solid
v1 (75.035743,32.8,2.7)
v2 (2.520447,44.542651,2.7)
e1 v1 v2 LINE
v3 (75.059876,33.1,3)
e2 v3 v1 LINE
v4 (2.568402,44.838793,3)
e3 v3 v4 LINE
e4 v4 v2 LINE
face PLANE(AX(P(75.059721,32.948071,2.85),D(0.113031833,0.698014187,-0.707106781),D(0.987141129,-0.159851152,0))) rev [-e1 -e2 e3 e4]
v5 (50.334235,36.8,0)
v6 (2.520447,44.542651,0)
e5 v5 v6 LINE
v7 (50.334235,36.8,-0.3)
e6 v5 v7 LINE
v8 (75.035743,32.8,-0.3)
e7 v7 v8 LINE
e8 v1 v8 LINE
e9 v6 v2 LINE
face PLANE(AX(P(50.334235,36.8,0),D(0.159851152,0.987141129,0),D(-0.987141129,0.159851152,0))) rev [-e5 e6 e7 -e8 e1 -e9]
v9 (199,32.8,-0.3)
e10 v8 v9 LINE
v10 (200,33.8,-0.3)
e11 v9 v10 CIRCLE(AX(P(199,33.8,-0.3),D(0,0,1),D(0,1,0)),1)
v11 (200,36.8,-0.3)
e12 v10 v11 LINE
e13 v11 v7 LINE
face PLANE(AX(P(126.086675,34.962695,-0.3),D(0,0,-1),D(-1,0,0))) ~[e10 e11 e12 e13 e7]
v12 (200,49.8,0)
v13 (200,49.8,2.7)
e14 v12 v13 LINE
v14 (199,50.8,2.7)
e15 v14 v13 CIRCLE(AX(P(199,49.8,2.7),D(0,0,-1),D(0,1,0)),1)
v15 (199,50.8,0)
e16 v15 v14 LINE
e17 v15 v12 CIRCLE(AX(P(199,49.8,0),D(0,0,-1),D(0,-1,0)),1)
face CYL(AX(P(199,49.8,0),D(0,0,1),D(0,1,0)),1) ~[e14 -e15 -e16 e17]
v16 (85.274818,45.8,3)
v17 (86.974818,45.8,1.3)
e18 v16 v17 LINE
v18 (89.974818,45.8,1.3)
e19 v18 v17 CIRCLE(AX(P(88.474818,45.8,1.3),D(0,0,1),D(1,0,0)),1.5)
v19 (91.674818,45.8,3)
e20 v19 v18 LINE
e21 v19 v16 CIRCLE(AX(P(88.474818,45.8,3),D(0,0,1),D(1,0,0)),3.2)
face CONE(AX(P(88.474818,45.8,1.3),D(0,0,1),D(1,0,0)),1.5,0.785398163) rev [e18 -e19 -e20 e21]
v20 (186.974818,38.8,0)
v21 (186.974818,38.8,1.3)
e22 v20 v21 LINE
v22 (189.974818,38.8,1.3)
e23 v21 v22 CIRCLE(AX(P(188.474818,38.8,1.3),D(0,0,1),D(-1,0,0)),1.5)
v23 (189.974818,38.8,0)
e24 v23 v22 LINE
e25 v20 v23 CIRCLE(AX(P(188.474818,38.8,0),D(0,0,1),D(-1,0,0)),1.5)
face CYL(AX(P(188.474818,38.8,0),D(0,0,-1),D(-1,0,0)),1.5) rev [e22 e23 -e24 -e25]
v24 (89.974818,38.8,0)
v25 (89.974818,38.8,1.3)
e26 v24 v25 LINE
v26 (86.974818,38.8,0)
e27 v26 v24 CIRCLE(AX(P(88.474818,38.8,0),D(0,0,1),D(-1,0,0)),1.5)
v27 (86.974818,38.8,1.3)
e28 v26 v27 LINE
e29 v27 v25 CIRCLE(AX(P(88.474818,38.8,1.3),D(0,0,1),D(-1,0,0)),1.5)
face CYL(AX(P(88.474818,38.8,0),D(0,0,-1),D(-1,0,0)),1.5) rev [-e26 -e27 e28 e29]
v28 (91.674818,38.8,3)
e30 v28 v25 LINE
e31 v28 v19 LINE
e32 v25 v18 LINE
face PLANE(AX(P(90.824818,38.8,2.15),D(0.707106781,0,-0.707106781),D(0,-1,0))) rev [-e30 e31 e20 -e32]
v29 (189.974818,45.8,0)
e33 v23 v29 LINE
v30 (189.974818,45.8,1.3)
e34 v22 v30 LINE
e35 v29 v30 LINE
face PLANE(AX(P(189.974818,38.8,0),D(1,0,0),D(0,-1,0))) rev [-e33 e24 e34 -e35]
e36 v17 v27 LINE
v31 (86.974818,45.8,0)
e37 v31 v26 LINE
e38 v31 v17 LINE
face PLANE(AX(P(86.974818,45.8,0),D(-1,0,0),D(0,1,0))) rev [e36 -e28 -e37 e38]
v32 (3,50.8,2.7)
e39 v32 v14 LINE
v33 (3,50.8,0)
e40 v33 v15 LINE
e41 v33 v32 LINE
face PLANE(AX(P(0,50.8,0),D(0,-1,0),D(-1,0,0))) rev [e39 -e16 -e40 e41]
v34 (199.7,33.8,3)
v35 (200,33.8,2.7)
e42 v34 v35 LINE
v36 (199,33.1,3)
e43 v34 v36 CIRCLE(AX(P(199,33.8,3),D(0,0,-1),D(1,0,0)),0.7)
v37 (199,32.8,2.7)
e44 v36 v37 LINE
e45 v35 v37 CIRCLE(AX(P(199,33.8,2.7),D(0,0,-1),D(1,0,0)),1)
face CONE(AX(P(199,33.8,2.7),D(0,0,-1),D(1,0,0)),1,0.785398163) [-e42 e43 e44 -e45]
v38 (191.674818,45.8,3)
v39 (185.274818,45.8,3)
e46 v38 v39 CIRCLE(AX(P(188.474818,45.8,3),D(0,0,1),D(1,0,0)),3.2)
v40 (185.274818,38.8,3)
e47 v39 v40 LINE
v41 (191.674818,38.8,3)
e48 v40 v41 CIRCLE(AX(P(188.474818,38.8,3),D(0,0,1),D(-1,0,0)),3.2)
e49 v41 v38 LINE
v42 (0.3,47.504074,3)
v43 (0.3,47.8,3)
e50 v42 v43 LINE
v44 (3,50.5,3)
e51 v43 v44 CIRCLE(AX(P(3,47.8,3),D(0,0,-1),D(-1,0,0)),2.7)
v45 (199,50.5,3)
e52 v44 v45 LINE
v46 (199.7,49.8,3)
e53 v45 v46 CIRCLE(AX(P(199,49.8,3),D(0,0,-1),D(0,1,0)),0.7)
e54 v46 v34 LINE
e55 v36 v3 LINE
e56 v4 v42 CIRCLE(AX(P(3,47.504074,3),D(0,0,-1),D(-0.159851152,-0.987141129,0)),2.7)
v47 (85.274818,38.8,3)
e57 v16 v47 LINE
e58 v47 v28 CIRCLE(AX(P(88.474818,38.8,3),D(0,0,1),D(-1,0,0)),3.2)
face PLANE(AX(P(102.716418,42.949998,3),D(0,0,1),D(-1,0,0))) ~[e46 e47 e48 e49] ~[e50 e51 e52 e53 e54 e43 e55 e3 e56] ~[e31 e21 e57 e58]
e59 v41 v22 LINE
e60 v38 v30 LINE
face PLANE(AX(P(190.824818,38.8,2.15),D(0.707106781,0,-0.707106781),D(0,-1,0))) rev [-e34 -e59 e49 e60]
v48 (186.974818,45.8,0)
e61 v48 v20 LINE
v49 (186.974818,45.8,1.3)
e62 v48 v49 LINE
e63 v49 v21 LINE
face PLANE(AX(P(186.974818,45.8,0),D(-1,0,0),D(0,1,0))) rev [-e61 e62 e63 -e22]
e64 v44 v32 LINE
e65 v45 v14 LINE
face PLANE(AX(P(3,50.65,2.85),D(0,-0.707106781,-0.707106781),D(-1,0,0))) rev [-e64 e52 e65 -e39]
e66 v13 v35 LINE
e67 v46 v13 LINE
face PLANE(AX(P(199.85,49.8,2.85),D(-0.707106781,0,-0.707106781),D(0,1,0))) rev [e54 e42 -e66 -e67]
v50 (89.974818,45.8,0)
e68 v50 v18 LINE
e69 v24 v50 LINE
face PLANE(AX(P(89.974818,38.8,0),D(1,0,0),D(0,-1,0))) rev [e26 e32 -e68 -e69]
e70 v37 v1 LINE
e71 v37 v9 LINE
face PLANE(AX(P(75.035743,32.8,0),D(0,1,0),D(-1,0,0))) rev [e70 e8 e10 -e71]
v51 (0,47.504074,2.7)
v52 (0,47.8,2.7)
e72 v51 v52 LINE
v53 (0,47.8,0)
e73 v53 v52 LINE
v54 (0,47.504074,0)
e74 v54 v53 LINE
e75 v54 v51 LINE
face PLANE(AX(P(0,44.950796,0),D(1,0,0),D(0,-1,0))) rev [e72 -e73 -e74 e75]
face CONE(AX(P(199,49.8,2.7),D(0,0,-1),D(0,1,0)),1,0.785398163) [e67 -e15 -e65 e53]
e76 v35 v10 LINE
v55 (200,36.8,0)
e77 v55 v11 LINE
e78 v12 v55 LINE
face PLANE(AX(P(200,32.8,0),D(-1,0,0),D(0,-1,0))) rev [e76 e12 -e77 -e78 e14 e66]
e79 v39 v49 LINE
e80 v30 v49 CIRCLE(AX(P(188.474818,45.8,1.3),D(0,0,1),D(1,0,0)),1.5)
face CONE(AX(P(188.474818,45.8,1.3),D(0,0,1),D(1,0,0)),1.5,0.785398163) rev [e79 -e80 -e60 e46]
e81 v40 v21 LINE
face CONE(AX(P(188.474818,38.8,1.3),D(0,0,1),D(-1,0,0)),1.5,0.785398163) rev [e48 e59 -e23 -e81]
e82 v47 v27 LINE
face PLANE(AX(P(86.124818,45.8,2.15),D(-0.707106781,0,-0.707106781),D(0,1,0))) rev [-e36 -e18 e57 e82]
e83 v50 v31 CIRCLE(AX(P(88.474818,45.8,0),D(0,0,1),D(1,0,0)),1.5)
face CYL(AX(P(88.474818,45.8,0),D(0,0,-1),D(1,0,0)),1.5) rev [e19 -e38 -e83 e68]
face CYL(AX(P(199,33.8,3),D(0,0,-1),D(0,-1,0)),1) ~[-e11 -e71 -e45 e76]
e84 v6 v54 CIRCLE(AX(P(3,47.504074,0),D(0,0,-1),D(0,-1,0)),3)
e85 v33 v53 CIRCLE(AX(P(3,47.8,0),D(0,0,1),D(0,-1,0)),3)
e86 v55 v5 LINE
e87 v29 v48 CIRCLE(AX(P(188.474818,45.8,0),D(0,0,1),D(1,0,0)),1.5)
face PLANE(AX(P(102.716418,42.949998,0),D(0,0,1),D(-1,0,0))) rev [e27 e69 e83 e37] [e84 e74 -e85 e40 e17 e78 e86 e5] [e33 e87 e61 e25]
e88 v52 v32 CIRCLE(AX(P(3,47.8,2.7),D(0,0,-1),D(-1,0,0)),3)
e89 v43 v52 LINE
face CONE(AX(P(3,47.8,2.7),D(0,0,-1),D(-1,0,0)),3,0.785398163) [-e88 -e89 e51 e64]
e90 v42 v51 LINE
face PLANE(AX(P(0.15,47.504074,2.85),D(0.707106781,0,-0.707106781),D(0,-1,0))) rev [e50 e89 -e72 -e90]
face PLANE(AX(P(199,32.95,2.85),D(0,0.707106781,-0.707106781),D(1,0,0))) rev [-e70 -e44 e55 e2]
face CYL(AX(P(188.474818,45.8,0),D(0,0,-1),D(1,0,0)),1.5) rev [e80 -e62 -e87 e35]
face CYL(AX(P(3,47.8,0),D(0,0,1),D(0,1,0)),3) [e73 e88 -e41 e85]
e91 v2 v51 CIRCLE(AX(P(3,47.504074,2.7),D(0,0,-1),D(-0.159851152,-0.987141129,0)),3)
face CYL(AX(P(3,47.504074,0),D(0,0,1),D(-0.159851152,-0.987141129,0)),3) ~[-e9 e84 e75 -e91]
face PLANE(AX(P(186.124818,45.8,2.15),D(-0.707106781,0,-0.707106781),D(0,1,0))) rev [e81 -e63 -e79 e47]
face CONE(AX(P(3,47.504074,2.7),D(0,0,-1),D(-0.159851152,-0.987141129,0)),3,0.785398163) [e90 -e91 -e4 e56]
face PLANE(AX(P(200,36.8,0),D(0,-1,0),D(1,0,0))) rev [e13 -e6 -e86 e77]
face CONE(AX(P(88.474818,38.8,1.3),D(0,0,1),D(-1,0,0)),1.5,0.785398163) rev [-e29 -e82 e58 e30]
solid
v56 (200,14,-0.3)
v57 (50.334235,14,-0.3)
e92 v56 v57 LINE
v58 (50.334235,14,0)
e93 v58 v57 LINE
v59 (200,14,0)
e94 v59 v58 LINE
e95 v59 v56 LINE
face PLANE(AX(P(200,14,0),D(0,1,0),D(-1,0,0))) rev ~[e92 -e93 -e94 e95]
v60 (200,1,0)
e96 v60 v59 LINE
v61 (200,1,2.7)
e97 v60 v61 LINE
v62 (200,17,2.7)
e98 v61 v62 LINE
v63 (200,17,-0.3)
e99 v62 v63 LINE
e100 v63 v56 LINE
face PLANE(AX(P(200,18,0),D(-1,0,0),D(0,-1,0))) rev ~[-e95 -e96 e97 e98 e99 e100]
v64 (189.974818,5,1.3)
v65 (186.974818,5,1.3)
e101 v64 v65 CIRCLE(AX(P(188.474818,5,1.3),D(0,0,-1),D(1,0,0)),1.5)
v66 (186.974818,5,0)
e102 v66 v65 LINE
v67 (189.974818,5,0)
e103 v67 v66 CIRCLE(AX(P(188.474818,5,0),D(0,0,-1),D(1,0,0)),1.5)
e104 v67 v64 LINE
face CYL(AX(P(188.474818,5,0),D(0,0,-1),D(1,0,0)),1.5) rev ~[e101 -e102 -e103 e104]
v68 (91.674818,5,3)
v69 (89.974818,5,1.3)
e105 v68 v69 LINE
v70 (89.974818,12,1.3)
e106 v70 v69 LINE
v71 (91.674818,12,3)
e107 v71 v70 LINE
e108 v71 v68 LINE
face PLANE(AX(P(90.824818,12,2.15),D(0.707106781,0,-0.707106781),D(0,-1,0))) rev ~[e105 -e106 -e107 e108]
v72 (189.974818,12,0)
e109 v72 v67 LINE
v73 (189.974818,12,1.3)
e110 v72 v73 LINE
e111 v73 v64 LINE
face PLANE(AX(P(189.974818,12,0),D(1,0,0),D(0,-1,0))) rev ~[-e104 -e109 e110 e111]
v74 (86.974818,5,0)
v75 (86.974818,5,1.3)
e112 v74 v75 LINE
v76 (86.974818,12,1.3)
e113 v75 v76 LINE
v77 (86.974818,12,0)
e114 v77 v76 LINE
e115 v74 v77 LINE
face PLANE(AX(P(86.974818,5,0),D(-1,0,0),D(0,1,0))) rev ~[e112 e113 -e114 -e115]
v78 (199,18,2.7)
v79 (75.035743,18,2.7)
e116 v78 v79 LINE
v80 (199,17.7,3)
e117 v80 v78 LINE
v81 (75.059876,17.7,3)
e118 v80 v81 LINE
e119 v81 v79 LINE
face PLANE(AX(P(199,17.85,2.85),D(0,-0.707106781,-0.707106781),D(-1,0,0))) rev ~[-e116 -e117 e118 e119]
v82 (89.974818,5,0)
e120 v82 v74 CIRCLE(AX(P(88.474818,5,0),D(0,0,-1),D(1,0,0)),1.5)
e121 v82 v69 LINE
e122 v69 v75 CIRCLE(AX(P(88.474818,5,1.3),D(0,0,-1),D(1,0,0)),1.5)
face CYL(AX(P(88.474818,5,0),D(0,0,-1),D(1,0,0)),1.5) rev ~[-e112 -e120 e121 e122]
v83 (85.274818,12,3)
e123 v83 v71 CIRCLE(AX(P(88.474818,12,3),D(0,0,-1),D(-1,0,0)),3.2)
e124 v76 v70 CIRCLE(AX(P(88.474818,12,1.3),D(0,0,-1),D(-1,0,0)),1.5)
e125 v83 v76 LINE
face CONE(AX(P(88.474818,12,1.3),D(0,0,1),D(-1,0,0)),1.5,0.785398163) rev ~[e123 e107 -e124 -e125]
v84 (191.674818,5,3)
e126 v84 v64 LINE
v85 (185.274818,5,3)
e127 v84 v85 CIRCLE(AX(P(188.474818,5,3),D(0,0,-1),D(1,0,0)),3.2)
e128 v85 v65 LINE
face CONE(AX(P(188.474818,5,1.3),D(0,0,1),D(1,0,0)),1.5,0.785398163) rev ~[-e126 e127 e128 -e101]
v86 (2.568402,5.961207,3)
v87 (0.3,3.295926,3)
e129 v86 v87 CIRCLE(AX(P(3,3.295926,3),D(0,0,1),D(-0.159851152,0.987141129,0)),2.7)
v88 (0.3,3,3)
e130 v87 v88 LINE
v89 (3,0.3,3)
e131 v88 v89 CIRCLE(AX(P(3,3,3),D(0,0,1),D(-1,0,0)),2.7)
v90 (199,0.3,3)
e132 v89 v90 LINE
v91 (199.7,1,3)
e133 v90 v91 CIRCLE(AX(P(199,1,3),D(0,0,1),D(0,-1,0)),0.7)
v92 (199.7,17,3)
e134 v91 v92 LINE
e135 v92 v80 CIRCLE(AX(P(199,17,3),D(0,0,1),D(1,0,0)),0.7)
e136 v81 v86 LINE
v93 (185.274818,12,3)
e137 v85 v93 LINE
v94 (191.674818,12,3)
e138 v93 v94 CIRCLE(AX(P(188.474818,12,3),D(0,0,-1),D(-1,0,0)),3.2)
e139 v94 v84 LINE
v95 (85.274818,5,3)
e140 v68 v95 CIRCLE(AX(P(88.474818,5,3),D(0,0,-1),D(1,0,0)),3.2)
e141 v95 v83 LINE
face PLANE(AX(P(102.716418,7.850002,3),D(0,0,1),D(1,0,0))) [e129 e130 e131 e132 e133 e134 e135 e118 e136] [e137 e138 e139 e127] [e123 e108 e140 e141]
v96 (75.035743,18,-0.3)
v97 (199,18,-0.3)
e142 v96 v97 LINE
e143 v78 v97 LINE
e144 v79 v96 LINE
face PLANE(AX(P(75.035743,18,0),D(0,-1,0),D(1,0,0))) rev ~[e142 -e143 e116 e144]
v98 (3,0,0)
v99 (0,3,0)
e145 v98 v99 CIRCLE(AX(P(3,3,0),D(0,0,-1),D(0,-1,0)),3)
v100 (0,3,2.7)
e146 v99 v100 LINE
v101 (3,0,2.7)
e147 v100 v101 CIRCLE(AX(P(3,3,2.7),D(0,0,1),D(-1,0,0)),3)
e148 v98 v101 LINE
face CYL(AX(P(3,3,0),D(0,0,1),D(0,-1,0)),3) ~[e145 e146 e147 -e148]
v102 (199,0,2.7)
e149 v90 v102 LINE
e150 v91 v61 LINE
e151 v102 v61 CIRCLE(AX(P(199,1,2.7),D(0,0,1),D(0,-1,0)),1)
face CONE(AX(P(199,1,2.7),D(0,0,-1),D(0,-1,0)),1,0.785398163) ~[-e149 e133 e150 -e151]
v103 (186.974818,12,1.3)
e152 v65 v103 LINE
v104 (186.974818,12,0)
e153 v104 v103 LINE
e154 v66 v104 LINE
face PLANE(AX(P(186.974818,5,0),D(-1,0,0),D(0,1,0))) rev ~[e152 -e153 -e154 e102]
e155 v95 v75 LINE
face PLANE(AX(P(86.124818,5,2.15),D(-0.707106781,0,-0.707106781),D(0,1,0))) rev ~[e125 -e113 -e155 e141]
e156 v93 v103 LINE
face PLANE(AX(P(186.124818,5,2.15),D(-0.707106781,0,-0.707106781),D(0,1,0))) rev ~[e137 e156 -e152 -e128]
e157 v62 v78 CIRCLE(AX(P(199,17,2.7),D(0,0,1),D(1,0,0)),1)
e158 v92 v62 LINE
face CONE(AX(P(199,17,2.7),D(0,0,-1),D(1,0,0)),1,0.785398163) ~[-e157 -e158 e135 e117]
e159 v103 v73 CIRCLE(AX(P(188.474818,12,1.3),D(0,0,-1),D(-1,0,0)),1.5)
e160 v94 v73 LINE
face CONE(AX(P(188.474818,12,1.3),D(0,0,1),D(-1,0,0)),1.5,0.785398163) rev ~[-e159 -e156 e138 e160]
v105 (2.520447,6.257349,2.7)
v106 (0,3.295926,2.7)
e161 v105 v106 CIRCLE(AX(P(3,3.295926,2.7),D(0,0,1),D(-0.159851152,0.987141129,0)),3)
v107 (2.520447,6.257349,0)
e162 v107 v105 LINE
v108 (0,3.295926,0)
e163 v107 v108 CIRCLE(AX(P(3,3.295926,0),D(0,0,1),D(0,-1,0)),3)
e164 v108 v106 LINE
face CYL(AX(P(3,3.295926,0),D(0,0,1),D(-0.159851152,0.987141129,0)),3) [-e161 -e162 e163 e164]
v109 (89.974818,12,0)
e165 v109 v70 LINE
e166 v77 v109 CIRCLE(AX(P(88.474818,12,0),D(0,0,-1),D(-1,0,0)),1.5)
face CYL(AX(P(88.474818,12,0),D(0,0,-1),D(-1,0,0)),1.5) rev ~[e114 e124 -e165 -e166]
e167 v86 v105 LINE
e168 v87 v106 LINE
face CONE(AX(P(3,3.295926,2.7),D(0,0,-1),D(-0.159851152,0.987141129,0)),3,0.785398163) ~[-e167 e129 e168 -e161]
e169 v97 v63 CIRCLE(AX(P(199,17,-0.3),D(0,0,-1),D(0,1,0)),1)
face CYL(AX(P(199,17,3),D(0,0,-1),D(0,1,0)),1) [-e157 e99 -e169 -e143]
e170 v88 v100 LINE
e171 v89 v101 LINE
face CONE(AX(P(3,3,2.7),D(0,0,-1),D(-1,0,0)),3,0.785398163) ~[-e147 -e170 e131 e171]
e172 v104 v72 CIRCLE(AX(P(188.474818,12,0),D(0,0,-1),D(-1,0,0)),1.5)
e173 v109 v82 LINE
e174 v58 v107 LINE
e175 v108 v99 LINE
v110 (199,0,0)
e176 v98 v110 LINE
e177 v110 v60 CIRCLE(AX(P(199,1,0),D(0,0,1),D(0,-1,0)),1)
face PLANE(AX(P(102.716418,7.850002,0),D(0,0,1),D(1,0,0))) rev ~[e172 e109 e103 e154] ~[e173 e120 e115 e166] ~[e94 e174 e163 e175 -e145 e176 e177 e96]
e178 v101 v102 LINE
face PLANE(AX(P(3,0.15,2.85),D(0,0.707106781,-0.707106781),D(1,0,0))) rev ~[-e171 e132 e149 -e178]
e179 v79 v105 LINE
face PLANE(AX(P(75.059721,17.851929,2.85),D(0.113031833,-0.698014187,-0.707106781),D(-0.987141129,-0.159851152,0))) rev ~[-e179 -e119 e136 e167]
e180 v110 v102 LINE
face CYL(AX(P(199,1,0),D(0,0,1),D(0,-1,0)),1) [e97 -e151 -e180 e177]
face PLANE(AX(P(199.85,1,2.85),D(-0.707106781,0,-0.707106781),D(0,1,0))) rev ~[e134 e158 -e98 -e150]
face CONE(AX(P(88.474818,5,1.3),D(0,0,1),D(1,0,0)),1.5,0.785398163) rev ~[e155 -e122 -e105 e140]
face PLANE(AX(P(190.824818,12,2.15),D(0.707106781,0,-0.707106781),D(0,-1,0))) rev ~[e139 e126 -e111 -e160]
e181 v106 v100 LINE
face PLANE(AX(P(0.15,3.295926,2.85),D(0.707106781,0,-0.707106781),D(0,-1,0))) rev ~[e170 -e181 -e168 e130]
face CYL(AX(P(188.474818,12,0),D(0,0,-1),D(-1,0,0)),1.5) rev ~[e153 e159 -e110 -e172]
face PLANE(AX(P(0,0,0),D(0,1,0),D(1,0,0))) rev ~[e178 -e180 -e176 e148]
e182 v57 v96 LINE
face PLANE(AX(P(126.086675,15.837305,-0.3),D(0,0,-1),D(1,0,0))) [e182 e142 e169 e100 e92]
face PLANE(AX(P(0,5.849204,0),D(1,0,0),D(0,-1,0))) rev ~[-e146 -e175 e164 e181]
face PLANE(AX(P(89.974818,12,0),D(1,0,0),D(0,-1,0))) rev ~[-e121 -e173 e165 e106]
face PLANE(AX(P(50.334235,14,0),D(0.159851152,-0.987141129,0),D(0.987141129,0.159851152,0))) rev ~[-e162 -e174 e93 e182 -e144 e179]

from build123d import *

# Parameters (mm, degrees)
F1_DEPTH    = 3
F3_DEPTH    = 0.3
F6_R        = 3
F6_2_R      = 3
F8_R        = 1
F8_2_R      = 1
F9_SIZE     = 0.3
F9_2_SIZE   = 0.3
F10_SIZE2   = 1.7
F10_SIZE    = 1.7
F10_2_SIZE2 = 1.7
F10_2_SIZE  = 1.7


# Not quite as in the source:
# - two fillets or chamfers of one size are made in one step
# - a feature names something its author has since deleted; it is built from what else it names


with BuildPart() as f1:
    # F0 (on Top) → F1 (new body)
    with BuildSketch(Plane.XY):
        Polygon((0, 5.8492044918), (0, 0), (200, 0), (200, 18), (75.0357434154, 18), align=None)
        with BuildLine():
            Line((89.974817574, 12), (89.974817574, 5))
            ThreePointArc((89.974817574, 5), (88.474817574, 3.5), (86.974817574, 5))
            Line((86.974817574, 5), (86.974817574, 12))
            ThreePointArc((86.974817574, 12), (88.474817574, 13.5), (89.974817574, 12))
        make_face(mode=Mode.SUBTRACT)
        with BuildLine():
            Line((189.974817574, 12), (189.974817574, 5))
            ThreePointArc((189.974817574, 5), (188.474817574, 3.5), (186.974817574, 5))
            Line((186.974817574, 5), (186.974817574, 12))
            ThreePointArc((186.974817574, 12), (188.474817574, 13.5), (189.974817574, 12))
        make_face(mode=Mode.SUBTRACT)
    extrude(amount=F1_DEPTH)

    # F2 (on face) → F3 (join)
    with BuildSketch(Plane(origin=(0, 0, 0), x_dir=(1, 0, 0), z_dir=(0, 0, -1))):
        Polygon((50.3342353158, -14), (75.0357434154, -18), (200, -18), (200, -14), align=None)
    extrude(amount=F3_DEPTH)


with BuildPart() as f5_1:
    # F5: instance of F1
    add(f1.part.mirror(Plane(origin=(100, 25.4, 1.5), x_dir=(1, 0, 0), z_dir=(0, -1, 0))))

    # F6#2
    f6_2_edges = [f5_1.edges().sort_by_distance(p)[0] for p in [
        (0, 44.950796, 1.5),
        (0, 50.8, 1.5),
    ]]
    fillet(f6_2_edges, radius=F6_2_R)

    # F8#2
    f8_2_edges = [f5_1.edges().sort_by_distance(p)[0] for p in [
        (200, 50.8, 1.5),
        (200, 32.8, 1.35),
    ]]
    fillet(f8_2_edges, radius=F8_2_R)

    # F9#2
    f9_2_edges = [f5_1.edges().sort_by_distance(p)[0] for p in [
        (137.017872, 32.8, 3),
        (200, 41.8, 3),
        (199.707107, 50.507107, 3),
        (101, 50.8, 3),
        (38.778095, 38.671325, 3),
        (0.87868, 49.92132, 3),
        (0.715415, 45.55968, 3),
        (0, 47.652037, 3),
        (199.707107, 33.092893, 3),
    ]]
    chamfer(f9_2_edges, length=F9_2_SIZE)

    # F10#2
    f10_2_edges = [f5_1.edges().sort_by_distance(p)[0] for p in [
        (189.974818, 42.3, 3),
        (188.474818, 37.3, 3),
        (186.974818, 42.3, 3),
        (188.474818, 47.3, 3),
        (88.474818, 47.3, 3),
        (89.974818, 42.3, 3),
        (88.474818, 37.3, 3),
        (86.974818, 42.3, 3),
    ]]
    chamfer(f10_2_edges, length=F10_2_SIZE, length2=F10_2_SIZE2)


with BuildPart() as f1_1:
    add(f1.part)

    # F6
    f6_edges = [f1_1.edges().sort_by_distance(p)[0] for p in [
        (0, 5.849204, 1.5),
        (0, 0, 1.5),
    ]]
    fillet(f6_edges, radius=F6_R)

    # F8
    f8_edges = [f1_1.edges().sort_by_distance(p)[0] for p in [
        (200, 0, 1.5),
        (200, 18, 1.35),
    ]]
    fillet(f8_edges, radius=F8_R)

    # F9
    f9_edges = [f1_1.edges().sort_by_distance(p)[0] for p in [
        (137.017872, 18, 3),
        (200, 9, 3),
        (199.707107, 0.292893, 3),
        (101, 0, 3),
        (38.778095, 12.128675, 3),
        (0.87868, 0.87868, 3),
        (0.715415, 5.24032, 3),
        (0, 3.147963, 3),
        (199.707107, 17.707107, 3),
    ]]
    chamfer(f9_edges, length=F9_SIZE)

    # F10
    f10_edges = [f1_1.edges().sort_by_distance(p)[0] for p in [
        (89.974818, 8.5, 3),
        (88.474818, 13.5, 3),
        (86.974818, 8.5, 3),
        (88.474818, 3.5, 3),
        (188.474818, 13.5, 3),
        (189.974818, 8.5, 3),
        (188.474818, 3.5, 3),
        (186.974818, 8.5, 3),
    ]]
    chamfer(f10_edges, length=F10_SIZE, length2=F10_SIZE2)


solid = Compound([f5_1.part, f1_1.part])
